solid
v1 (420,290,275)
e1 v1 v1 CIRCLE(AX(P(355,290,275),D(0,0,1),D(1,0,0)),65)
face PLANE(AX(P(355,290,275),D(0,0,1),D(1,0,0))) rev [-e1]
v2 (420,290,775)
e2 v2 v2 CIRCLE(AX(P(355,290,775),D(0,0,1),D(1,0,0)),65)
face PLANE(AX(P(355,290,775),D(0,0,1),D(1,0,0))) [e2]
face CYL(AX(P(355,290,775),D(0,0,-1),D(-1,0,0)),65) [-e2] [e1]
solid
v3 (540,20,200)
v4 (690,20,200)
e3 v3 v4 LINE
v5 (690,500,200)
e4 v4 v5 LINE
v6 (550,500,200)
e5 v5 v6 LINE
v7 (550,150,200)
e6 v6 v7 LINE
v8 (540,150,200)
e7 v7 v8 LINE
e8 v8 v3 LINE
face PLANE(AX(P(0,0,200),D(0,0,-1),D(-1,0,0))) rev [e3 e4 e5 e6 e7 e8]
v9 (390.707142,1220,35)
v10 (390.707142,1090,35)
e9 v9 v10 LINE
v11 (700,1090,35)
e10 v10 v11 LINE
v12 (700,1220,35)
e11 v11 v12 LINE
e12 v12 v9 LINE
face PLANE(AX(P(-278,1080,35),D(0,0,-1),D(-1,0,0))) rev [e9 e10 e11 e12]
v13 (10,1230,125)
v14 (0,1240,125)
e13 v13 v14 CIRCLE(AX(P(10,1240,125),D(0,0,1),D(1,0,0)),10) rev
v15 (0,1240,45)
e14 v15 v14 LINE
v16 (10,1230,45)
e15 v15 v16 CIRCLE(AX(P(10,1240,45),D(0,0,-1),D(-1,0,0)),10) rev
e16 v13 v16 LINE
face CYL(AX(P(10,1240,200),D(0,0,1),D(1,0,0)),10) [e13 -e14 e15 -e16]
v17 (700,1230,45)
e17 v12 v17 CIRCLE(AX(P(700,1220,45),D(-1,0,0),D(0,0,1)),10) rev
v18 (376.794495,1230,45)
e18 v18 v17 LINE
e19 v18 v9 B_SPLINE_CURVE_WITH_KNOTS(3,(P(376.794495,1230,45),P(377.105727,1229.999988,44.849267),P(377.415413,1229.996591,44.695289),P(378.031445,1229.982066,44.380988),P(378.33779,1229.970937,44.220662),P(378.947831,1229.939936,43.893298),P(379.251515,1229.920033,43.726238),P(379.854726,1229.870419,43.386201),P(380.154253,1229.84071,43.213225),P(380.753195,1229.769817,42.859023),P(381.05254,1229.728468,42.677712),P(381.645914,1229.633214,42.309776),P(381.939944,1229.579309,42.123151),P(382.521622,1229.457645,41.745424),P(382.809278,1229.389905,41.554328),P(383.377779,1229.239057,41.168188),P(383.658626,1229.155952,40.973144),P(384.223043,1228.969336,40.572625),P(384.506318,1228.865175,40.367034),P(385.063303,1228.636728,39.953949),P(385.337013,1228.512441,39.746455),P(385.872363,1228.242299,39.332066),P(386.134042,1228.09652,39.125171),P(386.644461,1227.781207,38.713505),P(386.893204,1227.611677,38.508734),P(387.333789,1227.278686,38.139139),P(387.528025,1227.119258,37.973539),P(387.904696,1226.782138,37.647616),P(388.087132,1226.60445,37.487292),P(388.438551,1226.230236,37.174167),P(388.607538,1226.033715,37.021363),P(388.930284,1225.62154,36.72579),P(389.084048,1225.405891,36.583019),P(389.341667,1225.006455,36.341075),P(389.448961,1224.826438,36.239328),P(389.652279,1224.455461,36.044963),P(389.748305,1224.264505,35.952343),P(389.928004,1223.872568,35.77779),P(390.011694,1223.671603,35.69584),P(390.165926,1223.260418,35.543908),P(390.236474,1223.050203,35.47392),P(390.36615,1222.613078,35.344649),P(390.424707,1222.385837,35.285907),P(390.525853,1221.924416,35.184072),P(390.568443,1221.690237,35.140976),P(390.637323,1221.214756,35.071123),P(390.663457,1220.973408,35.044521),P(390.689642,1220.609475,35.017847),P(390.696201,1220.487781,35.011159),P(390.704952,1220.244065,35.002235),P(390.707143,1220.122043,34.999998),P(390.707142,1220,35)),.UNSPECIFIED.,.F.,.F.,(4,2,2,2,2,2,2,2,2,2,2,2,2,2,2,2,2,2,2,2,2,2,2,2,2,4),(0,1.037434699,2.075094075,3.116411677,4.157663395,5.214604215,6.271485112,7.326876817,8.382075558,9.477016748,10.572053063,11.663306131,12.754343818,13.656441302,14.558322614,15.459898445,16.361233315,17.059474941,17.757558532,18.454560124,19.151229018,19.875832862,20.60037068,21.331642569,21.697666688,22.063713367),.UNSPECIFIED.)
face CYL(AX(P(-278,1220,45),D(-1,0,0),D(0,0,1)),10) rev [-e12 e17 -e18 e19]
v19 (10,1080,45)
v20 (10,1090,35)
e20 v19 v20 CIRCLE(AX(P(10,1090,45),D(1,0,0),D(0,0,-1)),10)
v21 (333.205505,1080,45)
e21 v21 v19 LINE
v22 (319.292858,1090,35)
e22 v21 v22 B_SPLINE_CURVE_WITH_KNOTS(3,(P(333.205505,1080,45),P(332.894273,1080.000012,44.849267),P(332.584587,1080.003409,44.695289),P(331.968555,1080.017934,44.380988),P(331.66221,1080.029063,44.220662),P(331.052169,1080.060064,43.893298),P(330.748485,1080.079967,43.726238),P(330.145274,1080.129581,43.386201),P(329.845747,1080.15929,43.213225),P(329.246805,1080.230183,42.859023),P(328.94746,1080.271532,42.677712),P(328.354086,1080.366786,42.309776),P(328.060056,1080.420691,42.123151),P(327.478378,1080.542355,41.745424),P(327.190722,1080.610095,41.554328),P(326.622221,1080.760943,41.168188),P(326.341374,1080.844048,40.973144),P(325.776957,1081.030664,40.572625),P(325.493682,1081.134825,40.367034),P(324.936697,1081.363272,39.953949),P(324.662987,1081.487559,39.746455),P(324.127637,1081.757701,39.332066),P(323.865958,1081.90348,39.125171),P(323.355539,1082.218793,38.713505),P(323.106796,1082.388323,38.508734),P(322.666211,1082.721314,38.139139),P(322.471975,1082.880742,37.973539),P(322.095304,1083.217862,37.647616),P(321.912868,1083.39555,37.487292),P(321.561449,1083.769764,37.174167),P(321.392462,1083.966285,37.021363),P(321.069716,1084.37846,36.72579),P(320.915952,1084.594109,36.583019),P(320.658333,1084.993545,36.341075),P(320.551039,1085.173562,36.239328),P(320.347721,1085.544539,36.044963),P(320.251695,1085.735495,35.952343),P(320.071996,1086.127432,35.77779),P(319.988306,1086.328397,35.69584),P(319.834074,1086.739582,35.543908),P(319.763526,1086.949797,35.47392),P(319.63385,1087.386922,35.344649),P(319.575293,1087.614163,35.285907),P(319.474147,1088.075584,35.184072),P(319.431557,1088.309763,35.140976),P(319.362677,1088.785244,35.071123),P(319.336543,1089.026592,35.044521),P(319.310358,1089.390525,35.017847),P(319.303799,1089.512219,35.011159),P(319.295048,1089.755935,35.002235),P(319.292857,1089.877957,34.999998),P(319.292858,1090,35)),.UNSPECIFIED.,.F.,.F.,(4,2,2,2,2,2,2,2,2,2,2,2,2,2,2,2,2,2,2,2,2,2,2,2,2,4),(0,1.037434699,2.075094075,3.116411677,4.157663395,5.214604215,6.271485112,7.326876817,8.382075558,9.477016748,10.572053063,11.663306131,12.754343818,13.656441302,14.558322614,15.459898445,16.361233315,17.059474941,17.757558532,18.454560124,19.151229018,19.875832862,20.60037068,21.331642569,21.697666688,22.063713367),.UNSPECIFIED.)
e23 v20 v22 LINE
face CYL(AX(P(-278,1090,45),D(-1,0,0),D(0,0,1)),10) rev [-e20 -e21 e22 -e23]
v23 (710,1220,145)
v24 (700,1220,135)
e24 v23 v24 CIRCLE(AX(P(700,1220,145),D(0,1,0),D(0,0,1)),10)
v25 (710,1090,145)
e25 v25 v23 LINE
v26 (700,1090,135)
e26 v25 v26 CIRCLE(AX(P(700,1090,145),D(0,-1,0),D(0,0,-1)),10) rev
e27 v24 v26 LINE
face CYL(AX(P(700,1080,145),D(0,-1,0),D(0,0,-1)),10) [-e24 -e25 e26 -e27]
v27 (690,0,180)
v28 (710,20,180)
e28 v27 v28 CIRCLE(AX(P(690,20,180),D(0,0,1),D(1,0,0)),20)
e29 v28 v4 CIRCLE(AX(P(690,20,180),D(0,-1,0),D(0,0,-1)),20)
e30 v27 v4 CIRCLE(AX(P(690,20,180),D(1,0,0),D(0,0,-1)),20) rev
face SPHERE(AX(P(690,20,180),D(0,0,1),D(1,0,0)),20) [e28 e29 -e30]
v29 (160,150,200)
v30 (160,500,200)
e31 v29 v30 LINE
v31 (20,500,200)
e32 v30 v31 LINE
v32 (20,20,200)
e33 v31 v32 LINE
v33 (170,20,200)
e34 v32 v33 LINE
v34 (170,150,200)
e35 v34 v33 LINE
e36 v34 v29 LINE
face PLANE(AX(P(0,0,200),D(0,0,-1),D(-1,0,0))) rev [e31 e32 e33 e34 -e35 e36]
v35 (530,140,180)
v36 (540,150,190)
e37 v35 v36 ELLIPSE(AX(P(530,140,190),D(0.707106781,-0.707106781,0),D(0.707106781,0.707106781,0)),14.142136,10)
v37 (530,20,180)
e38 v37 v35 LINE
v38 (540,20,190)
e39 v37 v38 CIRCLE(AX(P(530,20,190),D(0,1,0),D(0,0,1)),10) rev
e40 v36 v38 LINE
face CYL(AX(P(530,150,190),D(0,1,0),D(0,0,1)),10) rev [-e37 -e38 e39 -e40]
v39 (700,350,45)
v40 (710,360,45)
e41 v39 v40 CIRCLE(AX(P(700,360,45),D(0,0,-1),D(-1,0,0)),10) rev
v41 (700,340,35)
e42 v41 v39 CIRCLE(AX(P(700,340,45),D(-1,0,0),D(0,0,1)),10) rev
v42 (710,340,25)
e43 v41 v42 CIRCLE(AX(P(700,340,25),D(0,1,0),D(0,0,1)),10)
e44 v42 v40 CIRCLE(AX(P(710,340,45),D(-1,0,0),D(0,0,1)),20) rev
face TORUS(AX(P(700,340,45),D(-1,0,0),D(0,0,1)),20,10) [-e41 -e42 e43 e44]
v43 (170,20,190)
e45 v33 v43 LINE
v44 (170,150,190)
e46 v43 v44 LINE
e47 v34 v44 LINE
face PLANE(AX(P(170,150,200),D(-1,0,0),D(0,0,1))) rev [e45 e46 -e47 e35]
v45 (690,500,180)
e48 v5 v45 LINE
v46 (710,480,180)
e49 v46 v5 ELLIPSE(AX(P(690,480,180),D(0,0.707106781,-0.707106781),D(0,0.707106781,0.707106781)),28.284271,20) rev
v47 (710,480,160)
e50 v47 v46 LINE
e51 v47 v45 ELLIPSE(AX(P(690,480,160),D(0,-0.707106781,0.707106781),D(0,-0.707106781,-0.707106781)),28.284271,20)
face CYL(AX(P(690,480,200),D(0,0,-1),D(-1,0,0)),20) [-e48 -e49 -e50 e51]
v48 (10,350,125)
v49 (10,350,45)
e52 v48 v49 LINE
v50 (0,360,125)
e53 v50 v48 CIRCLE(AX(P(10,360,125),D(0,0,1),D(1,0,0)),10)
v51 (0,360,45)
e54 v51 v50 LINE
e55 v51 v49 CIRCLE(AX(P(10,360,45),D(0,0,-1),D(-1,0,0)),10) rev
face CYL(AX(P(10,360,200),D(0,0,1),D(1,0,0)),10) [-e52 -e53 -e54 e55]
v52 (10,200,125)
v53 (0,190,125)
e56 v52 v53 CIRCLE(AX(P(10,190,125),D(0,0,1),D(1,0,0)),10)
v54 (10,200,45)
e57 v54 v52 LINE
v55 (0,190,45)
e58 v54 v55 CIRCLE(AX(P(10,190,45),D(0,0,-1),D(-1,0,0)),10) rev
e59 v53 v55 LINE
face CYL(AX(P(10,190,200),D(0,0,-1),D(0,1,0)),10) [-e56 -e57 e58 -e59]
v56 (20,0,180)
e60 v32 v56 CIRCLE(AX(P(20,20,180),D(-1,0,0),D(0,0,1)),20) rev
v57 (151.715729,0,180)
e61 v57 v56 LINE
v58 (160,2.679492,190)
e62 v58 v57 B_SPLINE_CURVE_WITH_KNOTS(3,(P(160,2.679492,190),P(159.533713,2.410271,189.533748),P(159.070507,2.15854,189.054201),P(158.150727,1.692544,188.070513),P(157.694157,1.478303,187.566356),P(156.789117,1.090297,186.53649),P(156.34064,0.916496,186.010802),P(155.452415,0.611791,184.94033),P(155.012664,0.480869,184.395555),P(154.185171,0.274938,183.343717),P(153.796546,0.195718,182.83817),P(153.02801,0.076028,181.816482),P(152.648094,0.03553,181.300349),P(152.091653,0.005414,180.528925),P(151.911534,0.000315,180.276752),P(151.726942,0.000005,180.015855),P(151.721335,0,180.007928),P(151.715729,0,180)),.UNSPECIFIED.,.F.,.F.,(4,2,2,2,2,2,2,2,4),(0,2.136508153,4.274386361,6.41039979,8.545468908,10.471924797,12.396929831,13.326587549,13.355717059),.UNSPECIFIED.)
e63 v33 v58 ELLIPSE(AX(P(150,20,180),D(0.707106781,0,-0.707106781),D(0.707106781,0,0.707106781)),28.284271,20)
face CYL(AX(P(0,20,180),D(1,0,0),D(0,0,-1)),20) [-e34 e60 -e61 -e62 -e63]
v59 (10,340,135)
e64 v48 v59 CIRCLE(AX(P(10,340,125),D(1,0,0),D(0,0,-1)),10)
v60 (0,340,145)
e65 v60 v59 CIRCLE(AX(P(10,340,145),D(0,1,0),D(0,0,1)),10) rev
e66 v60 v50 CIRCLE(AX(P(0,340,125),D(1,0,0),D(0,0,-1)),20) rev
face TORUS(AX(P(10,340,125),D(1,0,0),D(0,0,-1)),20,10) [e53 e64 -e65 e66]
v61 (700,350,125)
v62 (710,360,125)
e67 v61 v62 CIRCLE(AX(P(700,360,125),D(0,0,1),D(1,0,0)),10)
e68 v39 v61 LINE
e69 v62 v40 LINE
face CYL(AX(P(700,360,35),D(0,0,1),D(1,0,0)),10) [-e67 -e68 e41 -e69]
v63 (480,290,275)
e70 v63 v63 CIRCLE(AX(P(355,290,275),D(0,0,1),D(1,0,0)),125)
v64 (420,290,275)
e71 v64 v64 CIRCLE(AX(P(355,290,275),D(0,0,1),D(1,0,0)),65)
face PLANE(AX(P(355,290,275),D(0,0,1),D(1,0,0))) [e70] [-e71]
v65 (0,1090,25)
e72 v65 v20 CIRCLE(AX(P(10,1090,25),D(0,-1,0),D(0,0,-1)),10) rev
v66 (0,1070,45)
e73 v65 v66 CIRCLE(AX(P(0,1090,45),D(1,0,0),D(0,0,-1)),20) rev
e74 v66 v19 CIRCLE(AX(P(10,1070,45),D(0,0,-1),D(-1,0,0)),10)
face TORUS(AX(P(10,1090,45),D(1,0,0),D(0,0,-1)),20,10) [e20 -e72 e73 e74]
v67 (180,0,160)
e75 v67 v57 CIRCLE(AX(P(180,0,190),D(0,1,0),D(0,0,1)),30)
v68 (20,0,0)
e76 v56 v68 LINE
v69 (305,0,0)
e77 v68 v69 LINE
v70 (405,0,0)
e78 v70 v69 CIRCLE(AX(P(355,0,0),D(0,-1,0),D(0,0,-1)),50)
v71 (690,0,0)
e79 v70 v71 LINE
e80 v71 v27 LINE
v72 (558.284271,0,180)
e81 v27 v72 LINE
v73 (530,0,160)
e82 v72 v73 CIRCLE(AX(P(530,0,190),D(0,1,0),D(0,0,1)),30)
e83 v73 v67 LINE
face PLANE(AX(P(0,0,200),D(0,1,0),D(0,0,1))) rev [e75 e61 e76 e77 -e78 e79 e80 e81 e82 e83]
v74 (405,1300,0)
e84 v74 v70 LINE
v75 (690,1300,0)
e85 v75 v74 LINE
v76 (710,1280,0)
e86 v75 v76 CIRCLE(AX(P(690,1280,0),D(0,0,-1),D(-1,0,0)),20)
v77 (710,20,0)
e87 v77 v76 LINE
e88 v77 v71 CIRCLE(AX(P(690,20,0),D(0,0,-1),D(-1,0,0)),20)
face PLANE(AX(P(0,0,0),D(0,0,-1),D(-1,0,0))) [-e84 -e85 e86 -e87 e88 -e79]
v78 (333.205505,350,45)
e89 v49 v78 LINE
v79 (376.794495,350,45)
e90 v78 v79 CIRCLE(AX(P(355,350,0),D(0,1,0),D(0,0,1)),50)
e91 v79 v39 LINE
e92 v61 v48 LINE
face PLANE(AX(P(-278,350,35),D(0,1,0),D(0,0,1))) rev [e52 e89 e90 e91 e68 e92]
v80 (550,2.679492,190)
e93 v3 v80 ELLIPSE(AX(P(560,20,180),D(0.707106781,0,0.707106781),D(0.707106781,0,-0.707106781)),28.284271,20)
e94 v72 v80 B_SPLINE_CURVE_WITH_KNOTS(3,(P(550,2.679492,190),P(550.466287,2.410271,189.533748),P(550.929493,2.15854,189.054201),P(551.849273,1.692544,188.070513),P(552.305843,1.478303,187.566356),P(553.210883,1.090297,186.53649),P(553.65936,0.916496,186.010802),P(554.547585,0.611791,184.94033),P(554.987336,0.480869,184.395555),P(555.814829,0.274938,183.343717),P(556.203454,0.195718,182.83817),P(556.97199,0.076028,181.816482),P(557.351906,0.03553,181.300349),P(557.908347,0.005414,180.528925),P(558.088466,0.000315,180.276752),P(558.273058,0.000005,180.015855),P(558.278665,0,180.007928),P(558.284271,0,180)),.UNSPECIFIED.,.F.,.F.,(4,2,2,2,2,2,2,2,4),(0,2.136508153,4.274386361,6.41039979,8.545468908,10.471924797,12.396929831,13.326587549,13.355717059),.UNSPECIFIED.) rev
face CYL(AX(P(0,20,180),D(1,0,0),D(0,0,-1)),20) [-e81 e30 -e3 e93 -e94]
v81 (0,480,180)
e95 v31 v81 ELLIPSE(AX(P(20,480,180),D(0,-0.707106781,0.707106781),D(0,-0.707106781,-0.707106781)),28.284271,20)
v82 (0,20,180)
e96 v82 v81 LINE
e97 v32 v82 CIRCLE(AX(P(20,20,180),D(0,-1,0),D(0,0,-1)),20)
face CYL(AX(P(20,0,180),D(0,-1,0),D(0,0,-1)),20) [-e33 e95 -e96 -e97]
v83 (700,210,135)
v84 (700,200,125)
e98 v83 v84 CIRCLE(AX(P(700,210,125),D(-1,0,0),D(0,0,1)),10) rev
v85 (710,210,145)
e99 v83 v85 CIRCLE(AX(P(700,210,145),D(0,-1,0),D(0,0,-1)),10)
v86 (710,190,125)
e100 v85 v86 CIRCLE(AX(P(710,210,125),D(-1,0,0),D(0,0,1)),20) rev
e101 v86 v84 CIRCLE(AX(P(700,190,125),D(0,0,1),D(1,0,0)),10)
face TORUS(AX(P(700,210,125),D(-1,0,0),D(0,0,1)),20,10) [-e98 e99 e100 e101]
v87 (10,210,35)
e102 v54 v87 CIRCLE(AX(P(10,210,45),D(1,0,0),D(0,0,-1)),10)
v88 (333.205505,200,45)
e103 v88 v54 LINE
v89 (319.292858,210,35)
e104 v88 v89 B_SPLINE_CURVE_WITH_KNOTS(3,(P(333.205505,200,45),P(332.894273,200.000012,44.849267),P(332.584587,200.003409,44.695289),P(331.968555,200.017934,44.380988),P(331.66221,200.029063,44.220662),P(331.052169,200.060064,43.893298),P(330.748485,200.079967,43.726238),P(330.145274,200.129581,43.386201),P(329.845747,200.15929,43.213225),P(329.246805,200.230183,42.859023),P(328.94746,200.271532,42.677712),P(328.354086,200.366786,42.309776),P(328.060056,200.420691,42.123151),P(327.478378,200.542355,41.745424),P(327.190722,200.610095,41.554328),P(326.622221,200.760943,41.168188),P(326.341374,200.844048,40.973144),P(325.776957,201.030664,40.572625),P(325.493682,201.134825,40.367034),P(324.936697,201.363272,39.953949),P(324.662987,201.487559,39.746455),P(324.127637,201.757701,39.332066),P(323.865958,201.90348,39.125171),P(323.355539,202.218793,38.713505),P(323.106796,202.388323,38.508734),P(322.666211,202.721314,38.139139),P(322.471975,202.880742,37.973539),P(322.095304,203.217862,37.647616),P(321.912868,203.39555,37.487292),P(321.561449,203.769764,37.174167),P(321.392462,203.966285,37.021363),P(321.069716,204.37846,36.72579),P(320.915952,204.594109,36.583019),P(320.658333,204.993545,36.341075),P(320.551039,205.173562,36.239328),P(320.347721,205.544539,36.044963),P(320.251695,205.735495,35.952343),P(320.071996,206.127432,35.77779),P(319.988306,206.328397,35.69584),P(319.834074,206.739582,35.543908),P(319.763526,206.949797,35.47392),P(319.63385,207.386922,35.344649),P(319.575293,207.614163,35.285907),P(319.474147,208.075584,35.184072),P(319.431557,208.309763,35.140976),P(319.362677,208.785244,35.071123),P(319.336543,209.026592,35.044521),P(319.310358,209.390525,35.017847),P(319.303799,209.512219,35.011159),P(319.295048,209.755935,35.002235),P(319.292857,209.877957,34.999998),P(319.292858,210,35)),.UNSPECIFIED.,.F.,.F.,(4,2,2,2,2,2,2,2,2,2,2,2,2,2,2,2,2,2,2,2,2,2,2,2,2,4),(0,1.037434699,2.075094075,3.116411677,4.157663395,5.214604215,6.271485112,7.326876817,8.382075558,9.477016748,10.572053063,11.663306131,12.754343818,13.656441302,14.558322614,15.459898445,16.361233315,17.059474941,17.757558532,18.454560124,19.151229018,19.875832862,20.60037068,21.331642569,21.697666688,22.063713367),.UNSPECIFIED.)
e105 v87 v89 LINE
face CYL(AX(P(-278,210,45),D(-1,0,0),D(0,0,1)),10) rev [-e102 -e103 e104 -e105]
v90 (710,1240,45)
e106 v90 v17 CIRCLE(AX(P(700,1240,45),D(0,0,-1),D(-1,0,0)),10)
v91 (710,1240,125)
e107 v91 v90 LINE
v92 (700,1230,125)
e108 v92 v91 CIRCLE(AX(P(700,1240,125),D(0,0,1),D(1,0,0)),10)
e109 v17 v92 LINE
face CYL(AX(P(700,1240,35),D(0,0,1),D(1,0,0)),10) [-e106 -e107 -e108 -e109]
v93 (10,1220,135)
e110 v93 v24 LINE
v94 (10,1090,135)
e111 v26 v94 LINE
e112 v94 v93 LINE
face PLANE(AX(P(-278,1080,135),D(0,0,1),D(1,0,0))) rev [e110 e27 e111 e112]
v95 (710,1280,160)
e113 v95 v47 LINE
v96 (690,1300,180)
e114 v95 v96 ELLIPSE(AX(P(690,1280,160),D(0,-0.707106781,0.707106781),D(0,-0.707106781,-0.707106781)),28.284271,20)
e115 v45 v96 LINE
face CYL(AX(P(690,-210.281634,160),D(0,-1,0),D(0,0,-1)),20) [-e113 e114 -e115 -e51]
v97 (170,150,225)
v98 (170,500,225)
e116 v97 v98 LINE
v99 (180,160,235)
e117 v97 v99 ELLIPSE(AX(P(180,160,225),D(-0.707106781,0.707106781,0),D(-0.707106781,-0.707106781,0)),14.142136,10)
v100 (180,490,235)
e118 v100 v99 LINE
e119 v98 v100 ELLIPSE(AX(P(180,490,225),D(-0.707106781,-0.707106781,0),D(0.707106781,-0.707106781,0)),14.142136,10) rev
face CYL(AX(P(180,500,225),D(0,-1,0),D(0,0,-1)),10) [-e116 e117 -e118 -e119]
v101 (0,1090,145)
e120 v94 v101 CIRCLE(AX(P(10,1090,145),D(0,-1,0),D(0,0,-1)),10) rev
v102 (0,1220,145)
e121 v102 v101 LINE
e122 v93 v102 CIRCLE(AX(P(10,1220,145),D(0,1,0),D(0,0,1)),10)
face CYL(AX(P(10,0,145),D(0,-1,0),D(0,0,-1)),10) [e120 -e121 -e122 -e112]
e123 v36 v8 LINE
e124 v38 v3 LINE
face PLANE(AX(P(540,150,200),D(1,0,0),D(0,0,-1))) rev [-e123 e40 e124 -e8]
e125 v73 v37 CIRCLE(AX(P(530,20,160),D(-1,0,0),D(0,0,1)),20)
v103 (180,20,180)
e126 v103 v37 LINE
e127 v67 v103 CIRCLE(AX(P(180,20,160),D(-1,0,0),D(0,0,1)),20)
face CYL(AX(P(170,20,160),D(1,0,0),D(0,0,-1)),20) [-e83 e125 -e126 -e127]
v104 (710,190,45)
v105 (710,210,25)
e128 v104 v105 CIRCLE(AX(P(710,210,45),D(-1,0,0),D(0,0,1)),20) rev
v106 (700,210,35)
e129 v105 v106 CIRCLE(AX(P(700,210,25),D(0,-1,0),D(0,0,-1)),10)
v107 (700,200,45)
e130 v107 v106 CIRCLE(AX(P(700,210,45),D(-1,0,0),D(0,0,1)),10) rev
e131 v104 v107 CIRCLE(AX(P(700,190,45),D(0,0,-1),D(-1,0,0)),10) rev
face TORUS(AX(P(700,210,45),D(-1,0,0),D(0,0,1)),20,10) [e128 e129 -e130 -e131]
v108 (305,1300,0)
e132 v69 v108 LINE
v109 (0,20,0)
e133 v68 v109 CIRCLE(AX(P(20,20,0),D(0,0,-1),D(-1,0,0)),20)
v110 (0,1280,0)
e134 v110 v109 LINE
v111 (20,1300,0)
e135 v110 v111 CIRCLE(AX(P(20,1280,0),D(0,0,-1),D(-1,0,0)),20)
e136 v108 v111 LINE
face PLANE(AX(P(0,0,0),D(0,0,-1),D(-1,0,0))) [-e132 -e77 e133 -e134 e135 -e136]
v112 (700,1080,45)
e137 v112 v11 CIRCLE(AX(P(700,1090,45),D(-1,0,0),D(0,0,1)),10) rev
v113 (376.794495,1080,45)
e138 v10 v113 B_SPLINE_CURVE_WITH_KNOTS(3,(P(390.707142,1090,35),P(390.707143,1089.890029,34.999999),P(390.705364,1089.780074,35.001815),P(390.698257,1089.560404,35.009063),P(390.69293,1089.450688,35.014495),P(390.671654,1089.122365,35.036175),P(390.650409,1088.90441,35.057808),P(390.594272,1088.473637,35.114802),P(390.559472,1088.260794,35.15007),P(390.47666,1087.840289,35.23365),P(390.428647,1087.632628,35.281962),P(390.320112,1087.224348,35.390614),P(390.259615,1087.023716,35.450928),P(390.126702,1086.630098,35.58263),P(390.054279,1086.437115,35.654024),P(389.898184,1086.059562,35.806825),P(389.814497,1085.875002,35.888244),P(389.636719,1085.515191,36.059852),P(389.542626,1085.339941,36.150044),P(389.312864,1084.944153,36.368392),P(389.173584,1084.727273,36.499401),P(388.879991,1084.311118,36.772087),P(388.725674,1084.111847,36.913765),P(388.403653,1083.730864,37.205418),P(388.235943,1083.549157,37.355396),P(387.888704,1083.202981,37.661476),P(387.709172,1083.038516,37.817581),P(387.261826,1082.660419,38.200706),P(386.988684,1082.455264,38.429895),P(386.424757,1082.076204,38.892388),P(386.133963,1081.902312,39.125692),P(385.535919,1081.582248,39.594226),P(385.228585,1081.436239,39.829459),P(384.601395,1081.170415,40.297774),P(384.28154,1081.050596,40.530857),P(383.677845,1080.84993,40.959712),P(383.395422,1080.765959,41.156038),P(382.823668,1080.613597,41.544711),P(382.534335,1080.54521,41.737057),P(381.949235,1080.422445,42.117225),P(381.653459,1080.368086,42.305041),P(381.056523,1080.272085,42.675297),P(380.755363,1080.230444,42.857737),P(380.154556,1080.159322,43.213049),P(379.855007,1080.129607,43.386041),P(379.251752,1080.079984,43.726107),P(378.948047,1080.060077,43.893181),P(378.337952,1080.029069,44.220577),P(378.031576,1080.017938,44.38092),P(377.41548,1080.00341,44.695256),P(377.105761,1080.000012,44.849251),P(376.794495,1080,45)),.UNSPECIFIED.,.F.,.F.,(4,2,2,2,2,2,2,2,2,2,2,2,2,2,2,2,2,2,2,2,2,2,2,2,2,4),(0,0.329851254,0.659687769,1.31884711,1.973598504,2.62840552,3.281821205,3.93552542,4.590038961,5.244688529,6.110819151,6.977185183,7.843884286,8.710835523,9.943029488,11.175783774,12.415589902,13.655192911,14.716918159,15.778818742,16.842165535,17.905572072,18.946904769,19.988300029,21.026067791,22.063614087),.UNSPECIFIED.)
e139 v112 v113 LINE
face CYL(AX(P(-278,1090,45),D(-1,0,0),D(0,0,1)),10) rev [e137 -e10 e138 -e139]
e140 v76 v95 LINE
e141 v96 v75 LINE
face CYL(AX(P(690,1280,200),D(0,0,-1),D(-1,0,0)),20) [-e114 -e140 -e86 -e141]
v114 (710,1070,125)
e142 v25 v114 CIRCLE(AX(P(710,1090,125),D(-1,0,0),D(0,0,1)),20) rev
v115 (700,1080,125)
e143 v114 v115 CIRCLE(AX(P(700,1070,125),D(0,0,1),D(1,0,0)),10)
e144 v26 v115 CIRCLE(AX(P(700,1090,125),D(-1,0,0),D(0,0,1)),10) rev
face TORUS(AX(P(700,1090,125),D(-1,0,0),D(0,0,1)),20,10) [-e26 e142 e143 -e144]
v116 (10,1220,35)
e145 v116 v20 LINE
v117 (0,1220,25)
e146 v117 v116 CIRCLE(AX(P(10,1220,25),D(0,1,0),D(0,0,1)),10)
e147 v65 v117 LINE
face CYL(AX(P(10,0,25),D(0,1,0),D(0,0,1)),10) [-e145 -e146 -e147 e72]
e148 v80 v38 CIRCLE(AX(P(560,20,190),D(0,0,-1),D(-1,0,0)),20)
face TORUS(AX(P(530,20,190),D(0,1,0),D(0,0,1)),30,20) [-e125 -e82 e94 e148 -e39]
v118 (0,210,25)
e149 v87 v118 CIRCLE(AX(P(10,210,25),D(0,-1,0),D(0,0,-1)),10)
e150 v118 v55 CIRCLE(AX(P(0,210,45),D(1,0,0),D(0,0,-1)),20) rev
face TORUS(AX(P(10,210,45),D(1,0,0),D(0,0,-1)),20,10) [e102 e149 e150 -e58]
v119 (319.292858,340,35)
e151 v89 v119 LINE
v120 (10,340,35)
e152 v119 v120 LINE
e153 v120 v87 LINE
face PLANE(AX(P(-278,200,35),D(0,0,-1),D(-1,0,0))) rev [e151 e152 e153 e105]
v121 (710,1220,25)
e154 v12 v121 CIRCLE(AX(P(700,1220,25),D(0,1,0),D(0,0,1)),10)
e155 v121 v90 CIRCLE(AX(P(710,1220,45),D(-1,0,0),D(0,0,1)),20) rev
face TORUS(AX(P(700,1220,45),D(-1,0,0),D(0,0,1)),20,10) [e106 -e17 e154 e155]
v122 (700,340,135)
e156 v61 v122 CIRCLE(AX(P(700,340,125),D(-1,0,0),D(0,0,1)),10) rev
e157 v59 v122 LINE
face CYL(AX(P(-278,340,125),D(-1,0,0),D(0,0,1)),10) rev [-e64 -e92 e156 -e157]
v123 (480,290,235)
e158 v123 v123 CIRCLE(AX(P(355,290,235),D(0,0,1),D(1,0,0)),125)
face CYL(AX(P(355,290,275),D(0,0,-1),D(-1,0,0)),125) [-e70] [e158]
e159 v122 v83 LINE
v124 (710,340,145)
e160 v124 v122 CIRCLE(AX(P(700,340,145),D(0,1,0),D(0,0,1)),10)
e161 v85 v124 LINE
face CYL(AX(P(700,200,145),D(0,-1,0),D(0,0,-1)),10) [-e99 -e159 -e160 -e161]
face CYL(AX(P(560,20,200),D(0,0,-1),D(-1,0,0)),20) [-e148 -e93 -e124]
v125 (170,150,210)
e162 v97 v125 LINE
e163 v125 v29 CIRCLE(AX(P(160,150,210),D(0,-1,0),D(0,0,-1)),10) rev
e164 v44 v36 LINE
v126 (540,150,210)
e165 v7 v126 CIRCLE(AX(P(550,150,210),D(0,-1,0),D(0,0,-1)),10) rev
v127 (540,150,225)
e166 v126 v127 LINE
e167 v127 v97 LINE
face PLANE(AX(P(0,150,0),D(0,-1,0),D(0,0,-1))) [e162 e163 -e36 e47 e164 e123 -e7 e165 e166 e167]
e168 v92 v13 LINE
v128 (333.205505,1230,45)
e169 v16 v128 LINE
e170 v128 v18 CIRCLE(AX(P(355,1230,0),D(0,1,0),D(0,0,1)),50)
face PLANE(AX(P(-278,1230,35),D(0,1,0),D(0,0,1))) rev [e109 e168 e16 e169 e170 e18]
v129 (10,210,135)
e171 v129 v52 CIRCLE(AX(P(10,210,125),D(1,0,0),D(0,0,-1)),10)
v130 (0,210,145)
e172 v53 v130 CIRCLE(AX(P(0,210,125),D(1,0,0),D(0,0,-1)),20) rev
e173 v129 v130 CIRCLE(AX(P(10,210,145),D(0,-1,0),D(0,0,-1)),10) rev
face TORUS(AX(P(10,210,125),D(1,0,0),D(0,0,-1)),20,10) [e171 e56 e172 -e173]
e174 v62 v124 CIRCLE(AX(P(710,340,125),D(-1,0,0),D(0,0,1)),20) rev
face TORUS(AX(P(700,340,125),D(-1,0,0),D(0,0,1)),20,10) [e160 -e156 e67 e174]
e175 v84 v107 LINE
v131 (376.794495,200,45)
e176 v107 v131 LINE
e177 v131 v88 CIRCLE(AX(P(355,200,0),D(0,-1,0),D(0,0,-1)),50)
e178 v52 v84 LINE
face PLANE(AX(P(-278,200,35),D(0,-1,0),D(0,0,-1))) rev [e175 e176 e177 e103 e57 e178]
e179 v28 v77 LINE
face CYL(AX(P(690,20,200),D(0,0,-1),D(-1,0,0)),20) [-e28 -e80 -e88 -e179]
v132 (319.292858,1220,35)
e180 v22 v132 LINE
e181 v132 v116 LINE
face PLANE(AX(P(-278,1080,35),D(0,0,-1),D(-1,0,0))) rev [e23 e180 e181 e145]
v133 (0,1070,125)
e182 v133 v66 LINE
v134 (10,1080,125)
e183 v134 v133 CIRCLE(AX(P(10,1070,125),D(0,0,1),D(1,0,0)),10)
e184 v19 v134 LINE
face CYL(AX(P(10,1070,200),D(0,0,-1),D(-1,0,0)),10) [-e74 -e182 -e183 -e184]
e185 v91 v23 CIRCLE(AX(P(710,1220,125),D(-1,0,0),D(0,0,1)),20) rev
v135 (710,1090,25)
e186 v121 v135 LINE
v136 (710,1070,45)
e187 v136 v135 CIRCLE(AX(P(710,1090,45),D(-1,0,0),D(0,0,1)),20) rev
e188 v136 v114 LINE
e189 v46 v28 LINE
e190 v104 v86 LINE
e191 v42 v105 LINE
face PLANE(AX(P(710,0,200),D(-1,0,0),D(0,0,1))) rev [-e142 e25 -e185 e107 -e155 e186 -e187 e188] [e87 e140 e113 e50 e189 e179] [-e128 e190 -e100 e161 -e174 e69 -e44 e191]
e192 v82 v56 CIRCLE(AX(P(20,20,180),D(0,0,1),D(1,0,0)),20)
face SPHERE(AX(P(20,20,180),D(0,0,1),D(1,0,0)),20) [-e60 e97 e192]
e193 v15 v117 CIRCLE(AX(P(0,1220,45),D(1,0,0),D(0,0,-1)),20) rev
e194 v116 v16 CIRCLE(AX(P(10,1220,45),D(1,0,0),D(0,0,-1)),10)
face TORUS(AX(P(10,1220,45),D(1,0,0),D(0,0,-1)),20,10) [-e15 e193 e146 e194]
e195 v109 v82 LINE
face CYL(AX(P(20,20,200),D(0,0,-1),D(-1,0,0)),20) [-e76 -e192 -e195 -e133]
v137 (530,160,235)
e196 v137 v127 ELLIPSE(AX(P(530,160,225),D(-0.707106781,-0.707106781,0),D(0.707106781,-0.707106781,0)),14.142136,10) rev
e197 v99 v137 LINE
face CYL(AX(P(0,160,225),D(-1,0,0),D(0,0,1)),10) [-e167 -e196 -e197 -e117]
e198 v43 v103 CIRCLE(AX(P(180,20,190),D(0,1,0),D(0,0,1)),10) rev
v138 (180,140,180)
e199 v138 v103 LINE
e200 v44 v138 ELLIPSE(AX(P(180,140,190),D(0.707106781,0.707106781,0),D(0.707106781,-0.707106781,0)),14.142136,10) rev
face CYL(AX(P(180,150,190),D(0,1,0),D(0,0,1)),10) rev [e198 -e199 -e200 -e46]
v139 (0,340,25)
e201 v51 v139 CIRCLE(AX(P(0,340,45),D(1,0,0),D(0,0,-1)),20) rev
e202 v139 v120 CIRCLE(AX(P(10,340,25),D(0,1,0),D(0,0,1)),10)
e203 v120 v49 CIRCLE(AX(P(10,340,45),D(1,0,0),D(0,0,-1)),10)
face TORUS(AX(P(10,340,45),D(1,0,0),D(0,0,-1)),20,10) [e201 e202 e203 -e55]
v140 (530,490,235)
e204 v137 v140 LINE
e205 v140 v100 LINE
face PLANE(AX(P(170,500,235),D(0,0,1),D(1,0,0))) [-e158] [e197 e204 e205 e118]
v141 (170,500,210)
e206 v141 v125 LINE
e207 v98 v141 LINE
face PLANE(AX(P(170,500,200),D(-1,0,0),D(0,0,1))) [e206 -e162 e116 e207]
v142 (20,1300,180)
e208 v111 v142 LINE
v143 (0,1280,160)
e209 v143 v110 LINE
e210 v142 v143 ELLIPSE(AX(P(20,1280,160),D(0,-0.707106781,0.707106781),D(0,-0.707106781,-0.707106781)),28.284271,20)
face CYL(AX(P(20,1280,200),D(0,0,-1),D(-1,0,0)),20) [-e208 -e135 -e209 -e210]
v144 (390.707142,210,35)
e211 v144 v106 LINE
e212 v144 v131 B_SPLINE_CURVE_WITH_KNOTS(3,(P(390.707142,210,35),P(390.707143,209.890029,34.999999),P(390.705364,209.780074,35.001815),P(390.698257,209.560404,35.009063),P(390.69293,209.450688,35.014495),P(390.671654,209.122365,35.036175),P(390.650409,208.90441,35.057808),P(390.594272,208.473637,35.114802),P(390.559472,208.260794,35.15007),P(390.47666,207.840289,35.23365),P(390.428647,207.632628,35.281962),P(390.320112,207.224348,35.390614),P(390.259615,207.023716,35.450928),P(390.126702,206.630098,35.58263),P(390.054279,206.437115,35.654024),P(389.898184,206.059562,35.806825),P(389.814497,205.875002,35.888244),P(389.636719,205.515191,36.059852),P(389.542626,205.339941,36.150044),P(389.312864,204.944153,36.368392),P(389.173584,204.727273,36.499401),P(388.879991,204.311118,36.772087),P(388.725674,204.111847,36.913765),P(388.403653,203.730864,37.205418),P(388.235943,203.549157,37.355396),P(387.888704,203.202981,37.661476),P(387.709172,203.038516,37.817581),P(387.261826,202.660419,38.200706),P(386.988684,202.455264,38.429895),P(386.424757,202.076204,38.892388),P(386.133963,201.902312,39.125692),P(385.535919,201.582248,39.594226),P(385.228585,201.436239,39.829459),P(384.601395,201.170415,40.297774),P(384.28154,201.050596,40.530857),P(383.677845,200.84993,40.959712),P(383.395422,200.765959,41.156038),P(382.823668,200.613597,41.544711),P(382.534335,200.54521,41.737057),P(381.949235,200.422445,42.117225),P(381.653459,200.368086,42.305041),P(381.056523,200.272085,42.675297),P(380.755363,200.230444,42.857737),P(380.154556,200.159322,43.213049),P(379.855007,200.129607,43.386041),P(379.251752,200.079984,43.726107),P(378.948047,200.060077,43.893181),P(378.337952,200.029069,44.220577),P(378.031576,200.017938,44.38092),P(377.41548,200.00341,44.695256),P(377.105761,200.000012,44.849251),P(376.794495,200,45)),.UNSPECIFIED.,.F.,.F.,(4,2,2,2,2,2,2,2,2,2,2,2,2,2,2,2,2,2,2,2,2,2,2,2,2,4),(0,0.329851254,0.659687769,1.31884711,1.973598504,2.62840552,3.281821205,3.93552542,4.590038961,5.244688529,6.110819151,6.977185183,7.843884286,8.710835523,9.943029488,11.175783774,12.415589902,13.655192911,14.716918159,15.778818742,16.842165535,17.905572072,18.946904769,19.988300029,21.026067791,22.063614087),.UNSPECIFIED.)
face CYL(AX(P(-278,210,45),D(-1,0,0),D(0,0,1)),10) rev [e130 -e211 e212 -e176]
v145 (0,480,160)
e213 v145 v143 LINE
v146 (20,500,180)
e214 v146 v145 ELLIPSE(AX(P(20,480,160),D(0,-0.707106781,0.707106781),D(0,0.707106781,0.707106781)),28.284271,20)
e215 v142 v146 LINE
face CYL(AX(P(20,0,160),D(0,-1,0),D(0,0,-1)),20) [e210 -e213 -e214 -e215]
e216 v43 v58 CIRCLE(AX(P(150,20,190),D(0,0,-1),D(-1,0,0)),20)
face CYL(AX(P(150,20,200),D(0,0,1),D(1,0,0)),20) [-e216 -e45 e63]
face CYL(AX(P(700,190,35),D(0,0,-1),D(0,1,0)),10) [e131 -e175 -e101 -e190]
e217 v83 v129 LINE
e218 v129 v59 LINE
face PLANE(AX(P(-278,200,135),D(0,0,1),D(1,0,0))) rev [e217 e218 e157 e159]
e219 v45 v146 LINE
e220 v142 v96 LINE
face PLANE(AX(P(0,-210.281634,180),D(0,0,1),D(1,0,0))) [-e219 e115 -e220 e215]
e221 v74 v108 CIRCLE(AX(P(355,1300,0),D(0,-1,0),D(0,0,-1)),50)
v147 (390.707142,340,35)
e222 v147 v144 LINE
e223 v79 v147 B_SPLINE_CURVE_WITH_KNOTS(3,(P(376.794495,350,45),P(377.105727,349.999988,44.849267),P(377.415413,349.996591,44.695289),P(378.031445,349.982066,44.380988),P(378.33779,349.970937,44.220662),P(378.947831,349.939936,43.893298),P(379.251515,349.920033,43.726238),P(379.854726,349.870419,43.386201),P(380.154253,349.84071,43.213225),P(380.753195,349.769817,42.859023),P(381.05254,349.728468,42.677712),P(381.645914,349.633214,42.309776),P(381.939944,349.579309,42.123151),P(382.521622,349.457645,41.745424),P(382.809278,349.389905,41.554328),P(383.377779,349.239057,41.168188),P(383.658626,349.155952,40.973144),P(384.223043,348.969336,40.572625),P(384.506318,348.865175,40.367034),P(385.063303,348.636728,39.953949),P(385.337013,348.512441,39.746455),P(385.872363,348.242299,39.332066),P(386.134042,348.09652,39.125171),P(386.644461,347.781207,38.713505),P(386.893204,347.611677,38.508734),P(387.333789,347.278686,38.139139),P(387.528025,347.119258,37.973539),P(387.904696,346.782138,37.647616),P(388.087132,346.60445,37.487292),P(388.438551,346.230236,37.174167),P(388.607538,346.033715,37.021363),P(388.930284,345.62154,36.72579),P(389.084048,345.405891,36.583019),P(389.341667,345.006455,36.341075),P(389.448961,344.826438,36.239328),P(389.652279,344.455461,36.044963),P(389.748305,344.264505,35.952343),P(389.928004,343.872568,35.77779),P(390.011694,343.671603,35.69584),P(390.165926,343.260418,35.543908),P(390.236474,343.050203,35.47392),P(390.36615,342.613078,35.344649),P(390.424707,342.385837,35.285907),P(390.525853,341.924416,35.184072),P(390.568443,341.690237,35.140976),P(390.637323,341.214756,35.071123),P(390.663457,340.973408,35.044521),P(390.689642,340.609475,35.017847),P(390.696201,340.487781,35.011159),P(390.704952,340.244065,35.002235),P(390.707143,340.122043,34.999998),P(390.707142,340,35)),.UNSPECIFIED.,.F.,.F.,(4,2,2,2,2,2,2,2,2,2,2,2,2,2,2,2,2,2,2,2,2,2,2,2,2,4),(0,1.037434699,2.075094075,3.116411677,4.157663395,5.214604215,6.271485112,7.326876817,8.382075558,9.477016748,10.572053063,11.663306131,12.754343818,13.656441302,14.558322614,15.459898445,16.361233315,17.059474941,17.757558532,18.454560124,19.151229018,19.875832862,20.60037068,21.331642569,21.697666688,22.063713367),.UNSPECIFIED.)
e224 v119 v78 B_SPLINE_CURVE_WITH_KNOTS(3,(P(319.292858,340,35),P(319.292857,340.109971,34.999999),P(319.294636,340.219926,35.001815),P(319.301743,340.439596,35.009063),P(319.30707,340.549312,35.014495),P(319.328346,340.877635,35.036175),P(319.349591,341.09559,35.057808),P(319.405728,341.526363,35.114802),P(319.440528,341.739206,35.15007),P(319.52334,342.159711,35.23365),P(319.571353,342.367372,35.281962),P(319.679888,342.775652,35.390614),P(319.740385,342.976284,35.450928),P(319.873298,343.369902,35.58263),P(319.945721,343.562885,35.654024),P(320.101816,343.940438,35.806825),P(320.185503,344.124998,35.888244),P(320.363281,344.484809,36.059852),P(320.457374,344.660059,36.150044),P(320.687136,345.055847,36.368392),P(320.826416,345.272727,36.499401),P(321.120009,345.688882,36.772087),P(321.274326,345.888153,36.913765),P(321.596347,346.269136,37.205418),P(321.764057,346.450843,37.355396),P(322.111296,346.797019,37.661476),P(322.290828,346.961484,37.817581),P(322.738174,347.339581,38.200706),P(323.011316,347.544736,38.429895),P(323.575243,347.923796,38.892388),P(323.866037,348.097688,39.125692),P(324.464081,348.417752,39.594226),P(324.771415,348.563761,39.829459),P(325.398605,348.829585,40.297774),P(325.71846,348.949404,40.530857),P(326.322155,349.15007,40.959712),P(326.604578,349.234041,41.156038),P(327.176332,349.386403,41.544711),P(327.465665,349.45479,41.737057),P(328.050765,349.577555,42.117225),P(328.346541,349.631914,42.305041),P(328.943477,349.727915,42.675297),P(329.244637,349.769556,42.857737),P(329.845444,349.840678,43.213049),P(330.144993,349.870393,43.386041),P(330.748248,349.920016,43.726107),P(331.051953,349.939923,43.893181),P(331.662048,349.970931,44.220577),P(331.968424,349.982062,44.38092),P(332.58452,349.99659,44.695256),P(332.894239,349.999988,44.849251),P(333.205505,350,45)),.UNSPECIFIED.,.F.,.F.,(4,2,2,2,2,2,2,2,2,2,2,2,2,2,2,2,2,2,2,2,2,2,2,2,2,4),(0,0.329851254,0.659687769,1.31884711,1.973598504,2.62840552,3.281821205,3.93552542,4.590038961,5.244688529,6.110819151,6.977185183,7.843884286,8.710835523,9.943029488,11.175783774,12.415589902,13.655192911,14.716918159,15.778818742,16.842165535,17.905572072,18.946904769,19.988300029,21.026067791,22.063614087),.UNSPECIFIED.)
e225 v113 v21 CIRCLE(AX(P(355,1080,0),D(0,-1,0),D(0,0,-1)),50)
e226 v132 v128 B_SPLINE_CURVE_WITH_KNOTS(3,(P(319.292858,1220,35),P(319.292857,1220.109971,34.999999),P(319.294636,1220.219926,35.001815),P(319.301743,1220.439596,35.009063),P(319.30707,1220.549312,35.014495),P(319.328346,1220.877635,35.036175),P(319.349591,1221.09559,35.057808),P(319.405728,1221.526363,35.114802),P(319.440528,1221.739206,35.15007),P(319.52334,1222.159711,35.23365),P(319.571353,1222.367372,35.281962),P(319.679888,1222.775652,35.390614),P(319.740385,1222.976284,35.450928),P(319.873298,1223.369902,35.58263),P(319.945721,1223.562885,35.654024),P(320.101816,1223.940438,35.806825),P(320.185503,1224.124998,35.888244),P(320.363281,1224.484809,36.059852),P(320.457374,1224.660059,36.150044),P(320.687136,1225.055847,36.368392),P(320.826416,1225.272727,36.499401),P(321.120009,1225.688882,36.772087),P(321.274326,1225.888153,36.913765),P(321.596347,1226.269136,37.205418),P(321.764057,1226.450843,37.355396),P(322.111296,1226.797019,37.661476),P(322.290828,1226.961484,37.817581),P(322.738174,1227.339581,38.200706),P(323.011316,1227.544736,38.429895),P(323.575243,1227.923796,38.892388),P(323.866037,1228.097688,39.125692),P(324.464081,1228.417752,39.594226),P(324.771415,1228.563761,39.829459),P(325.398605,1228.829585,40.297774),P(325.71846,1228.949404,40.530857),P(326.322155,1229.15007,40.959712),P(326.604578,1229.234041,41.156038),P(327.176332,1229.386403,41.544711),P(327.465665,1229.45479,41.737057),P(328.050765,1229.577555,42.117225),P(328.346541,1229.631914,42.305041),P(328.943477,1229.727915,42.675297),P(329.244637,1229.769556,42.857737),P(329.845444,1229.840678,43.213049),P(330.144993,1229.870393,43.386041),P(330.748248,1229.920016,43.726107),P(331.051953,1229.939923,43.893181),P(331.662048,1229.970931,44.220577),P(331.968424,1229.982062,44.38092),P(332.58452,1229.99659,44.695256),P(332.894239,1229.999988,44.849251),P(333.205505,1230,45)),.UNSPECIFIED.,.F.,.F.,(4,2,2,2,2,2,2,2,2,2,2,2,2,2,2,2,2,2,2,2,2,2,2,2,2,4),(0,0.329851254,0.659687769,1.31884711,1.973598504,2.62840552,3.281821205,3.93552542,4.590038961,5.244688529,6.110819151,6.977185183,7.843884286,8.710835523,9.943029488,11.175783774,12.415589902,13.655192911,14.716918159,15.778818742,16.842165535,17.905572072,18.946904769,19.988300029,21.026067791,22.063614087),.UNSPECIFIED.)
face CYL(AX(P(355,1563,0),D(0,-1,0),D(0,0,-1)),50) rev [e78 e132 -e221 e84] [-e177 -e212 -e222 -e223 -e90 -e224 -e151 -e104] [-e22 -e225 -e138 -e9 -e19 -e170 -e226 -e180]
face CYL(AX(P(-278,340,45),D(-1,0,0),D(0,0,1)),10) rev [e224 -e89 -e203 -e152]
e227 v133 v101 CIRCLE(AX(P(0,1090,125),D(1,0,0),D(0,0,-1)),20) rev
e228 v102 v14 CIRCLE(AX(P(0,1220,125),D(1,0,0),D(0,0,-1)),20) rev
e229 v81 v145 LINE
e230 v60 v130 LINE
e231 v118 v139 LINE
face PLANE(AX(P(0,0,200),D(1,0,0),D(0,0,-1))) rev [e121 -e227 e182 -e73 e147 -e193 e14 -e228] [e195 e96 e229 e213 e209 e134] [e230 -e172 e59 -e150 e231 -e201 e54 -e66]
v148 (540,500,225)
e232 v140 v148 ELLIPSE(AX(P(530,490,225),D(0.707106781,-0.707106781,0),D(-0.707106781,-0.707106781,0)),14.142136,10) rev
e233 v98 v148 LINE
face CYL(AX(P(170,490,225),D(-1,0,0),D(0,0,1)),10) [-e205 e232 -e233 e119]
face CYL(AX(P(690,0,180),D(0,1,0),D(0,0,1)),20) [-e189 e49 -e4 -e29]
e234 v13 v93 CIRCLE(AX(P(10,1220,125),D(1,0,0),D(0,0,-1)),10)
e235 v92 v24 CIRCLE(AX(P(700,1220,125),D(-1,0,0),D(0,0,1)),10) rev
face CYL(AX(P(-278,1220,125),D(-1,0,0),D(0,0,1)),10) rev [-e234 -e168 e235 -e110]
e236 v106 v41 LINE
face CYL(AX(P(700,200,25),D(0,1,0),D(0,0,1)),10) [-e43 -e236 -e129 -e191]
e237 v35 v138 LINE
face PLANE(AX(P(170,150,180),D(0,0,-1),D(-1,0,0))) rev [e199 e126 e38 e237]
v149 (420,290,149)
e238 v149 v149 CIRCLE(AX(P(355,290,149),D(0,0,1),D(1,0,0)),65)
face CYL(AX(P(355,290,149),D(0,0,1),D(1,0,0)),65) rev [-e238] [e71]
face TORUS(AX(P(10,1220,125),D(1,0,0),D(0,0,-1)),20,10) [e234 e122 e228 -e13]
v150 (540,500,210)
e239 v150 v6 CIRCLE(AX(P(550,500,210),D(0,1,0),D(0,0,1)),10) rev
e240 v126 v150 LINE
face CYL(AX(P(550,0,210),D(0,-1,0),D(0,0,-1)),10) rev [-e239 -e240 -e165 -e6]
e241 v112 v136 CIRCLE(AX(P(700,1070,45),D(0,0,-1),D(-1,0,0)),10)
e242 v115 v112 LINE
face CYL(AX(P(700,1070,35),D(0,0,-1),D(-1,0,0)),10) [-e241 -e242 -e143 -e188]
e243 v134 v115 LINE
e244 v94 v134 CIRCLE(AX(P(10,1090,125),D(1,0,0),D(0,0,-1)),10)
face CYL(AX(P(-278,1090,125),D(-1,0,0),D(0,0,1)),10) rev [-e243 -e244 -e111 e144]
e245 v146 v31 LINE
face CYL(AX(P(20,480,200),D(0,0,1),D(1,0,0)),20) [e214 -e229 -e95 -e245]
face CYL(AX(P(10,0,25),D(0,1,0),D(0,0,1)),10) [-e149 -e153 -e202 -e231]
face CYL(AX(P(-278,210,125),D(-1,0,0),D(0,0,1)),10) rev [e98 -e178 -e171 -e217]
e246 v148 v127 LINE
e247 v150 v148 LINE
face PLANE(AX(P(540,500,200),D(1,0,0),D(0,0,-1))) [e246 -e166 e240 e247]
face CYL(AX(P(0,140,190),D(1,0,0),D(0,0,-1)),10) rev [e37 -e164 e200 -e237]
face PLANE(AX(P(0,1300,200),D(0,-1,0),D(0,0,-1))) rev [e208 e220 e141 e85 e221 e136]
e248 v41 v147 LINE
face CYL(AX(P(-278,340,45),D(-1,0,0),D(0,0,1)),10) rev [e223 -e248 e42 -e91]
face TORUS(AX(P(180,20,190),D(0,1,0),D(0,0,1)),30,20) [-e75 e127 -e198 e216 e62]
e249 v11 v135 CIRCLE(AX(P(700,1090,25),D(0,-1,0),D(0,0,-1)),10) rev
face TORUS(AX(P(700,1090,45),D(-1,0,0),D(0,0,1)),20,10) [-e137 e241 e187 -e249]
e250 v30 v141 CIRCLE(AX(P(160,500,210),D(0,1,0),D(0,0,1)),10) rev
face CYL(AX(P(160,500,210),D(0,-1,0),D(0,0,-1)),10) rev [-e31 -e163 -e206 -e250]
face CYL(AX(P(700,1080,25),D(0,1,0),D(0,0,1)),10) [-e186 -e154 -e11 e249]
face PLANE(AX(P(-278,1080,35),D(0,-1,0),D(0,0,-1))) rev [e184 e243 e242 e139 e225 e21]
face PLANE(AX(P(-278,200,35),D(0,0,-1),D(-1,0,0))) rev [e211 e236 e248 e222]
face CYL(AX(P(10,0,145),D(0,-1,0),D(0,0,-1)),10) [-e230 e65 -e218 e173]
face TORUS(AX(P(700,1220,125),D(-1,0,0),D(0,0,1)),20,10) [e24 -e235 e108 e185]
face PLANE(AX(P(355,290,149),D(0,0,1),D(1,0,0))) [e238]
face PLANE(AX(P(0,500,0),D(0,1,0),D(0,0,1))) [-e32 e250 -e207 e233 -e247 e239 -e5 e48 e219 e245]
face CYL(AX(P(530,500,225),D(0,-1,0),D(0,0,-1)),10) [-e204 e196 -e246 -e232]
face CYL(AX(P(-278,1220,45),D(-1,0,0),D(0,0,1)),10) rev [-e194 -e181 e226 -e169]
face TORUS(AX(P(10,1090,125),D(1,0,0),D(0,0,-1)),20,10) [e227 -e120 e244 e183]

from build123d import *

# Parameters (mm, degrees)
SKETCH1_W           = 710
SKETCH1_H           = 1300
BOSS_EXTRUDE1_DEPTH = 200
SKETCH2_W           = 100
SKETCH2_H           = 150
CUT_EXTRUDE1_DEPTH  = 988
SKETCH4_W           = 370
SKETCH4_H           = 20
CUT_EXTRUDE2_DEPTH  = 150
SKETCH5_W           = 370
SKETCH5_H           = 35
BOSS_EXTRUDE2_DEPTH = 350
SKETCH6_R           = 125
BOSS_EXTRUDE3_DEPTH = 40
SKETCH7_R           = 65
CUT_EXTRUDE3_DEPTH  = 126
FILLET4_R           = 10
FILLET5_R           = 10
SKETCH8_W           = 710
SKETCH8_H           = 20
CUT_EXTRUDE6_DEPTH  = 800
SKETCH9_R           = 50
CUT_EXTRUDE7_DEPTH  = 1563
FILLET6_R           = 20
FILLET7_R           = 10
FILLET8_R           = 10
SKETCH10_R          = 65
BOSS_EXTRUDE4_DEPTH = 500


with BuildPart() as part:
    # Sketch1 → Boss-Extrude1 (new body)
    with BuildSketch(Plane.XY):
        with Locations((355, 650)):
            Rectangle(SKETCH1_W, SKETCH1_H)
    extrude(amount=BOSS_EXTRUDE1_DEPTH)

    # Sketch2 → Cut-Extrude1 (cut)
    with BuildSketch(Plane(origin=(710, 0, 0), x_dir=(0, 0, -1), z_dir=(1, 0, 0))):
        with Locations((-85, 275)):
            Rectangle(SKETCH2_W, SKETCH2_H)
        with Locations((-85, 1155)):
            Rectangle(SKETCH2_W, SKETCH2_H)
    extrude(amount=-CUT_EXTRUDE1_DEPTH, mode=Mode.SUBTRACT)

    # Sketch4 → Cut-Extrude2 (cut)
    with BuildSketch(Plane.XZ):
        with Locations((355, 190)):
            Rectangle(SKETCH4_W, SKETCH4_H)
    extrude(amount=-CUT_EXTRUDE2_DEPTH, mode=Mode.SUBTRACT)

    # Sketch5 → Boss-Extrude2 (add)
    with BuildSketch(Plane.XZ.offset(-150)):
        with Locations((355, 217.5)):
            Rectangle(SKETCH5_W, SKETCH5_H)
    extrude(amount=-BOSS_EXTRUDE2_DEPTH)

    # Sketch6 → Boss-Extrude3 (add)
    with BuildSketch(Plane.XY.offset(235)):
        with Locations((355, 290)):
            Circle(SKETCH6_R)
    extrude(amount=BOSS_EXTRUDE3_DEPTH)

    # Sketch7 → Cut-Extrude3 (cut)
    with BuildSketch(Plane.XY.offset(275)):
        with Locations((355, 290)):
            Circle(SKETCH7_R)
    extrude(amount=-CUT_EXTRUDE3_DEPTH, mode=Mode.SUBTRACT)

    # Fillet4
    fillet4_edges = [part.edges().sort_by_distance(p)[0] for p in [
        (170, 75, 180),
        (355, 150, 180),
        (540, 75, 180),
    ]]
    fillet(fillet4_edges, radius=FILLET4_R)

    # Fillet5
    fillet5_edges = [part.edges().sort_by_distance(p)[0] for p in [
        (0, 275, 35),
        (355, 350, 35),
        (0, 200, 85),
        (355, 200, 35),
        (0, 275, 135),
        (355, 200, 135),
        (0, 350, 85),
        (355, 350, 135),
        (710, 275, 35),
        (710, 350, 85),
        (710, 275, 135),
        (710, 200, 85),
        (0, 1155, 35),
        (355, 1230, 35),
        (0, 1080, 85),
        (355, 1080, 35),
        (0, 1155, 135),
        (355, 1080, 135),
        (0, 1230, 85),
        (355, 1230, 135),
        (710, 1155, 35),
        (710, 1230, 85),
        (710, 1155, 135),
        (710, 1080, 85),
    ]]
    fillet(fillet5_edges, radius=FILLET5_R)

    # Sketch8 → Cut-Extrude6 (cut)
    with BuildSketch(Plane(origin=(0, 1300, 0), x_dir=(1, 0, 0), z_dir=(0, 1, 0))):
        with Locations((355, -190)):
            Rectangle(SKETCH8_W, SKETCH8_H)
    extrude(amount=-CUT_EXTRUDE6_DEPTH, mode=Mode.SUBTRACT)

    # Sketch9 → Cut-Extrude7 (cut)
    with BuildSketch(Plane.XZ):
        with Locations((355, 0)):
            Circle(SKETCH9_R)
    extrude(amount=-CUT_EXTRUDE7_DEPTH, mode=Mode.SUBTRACT)

    # Fillet6
    # the kernel refuses this fillet: 20 mm, written as the material it takes off along each edge
    with BuildSketch(Plane(origin=(690, 20, 180), x_dir=(0, 0, 1), z_dir=(1, 0, 0))) as fillet6_piece_1_section:
        Polygon((0, 0), (FILLET6_R, 0), (FILLET6_R, FILLET6_R), (0, FILLET6_R), align=None)
    fillet6_piece_1 = extrude(amount=FILLET6_R, mode=Mode.PRIVATE)
    fillet6_piece_1 = fillet6_piece_1 - Plane(origin=(690, 20, 180), x_dir=(0, 0.7071067811865475, -0.7071067811865475), z_dir=(1, 0, 0)) * Sphere(FILLET6_R, mode=Mode.PRIVATE)
    add(fillet6_piece_1, mode=Mode.SUBTRACT)
    with BuildSketch(Plane(origin=(20, 20, 180), x_dir=(0, 0, 1), z_dir=(-1, 0, 0))) as fillet6_piece_2_section:
        Polygon((0, 0), (FILLET6_R, 0), (FILLET6_R, -FILLET6_R), (0, -FILLET6_R), align=None)
    fillet6_piece_2 = extrude(amount=FILLET6_R, mode=Mode.PRIVATE)
    fillet6_piece_2 = fillet6_piece_2 - Plane(origin=(20, 20, 180), x_dir=(0, 0.7071067811865475, -0.7071067811865475), z_dir=(-1, 0, 0)) * Sphere(FILLET6_R, mode=Mode.PRIVATE)
    add(fillet6_piece_2, mode=Mode.SUBTRACT)
    with BuildSketch(Plane(origin=(180, 0, 190), x_dir=(0, 0, -1), z_dir=(1, 0, 0))) as fillet6_piece_3:
        with BuildLine():
            CenterArc((10 + FILLET6_R, FILLET6_R), FILLET6_R, 180, 90)
            Line((10, FILLET6_R), (10, 0))
            Line((10, 0), (10 + FILLET6_R, 0))
        make_face()
    revolve(axis=Axis((180, 0, 190), (0, 1, 0)), revolution_arc=90, mode=Mode.SUBTRACT)
    with BuildSketch(Plane(origin=(530, 0, 190), x_dir=(1, 0, 0), z_dir=(0, 0, 1))) as fillet6_piece_4:
        with BuildLine():
            CenterArc((10 + FILLET6_R, FILLET6_R), FILLET6_R, 180, 90)
            Line((10, FILLET6_R), (10, 0))
            Line((10, 0), (10 + FILLET6_R, 0))
        make_face()
    revolve(axis=Axis((530, 0, 190), (0, 1, 0)), revolution_arc=90, mode=Mode.SUBTRACT)
    with BuildSketch(Plane(origin=(710, 1350, 180), x_dir=(0, 0, -1), z_dir=(0, -1, 0)), Plane(origin=(0, 1350, 180), x_dir=(1, 0, 0), z_dir=(0, -1, 0))) as fillet6_piece_5:
        with BuildLine():
            CenterArc((FILLET6_R, -FILLET6_R), FILLET6_R, 90, 90)
            Line((0, -FILLET6_R), (0, 0))
            Line((0, 0), (FILLET6_R, 0))
        make_face()
    extrude(amount=850, mode=Mode.SUBTRACT)
    with BuildSketch(Plane(origin=(710, 500, 250), x_dir=(0, -1, 0), z_dir=(0, 0, -1))) as fillet6_piece_6:
        with BuildLine():
            CenterArc((FILLET6_R, FILLET6_R), FILLET6_R, 180, 90)
            Line((0, FILLET6_R), (0, 0))
            Line((0, 0), (FILLET6_R, 0))
        make_face()
    extrude(amount=70, mode=Mode.SUBTRACT)
    with BuildSketch(Plane(origin=(0, 500, 180), x_dir=(1, 0, 0), z_dir=(0, 0, 1))) as fillet6_piece_7:
        with BuildLine():
            CenterArc((FILLET6_R, -FILLET6_R), FILLET6_R, 90, 90)
            Line((0, -FILLET6_R), (0, 0))
            Line((0, 0), (FILLET6_R, 0))
        make_face()
    extrude(amount=70, mode=Mode.SUBTRACT)
    with BuildSketch(Plane(origin=(710, 20, 200), x_dir=(0, 0, -1), z_dir=(0, 1, 0)), Plane(origin=(0, 550, 200), x_dir=(0, 0, -1), z_dir=(0, -1, 0))) as fillet6_piece_8:
        with BuildLine():
            CenterArc((FILLET6_R, FILLET6_R), FILLET6_R, 180, 90)
            Line((0, FILLET6_R), (0, 0))
            Line((0, 0), (FILLET6_R, 0))
        make_face()
    extrude(amount=530, mode=Mode.SUBTRACT)
    with BuildSketch(Plane(origin=(490, 0, 200), x_dir=(0, 1, 0), z_dir=(1, 0, 0))) as fillet6_piece_9:
        with BuildLine():
            CenterArc((FILLET6_R, -FILLET6_R), FILLET6_R, 90, 90)
            Line((0, -FILLET6_R), (0, 0))
            Line((0, 0), (FILLET6_R, 0))
        make_face()
    extrude(amount=200, mode=Mode.SUBTRACT)
    with BuildSketch(Plane(origin=(20, 0, 200), x_dir=(0, 0, -1), z_dir=(1, 0, 0))) as fillet6_piece_10:
        with BuildLine():
            CenterArc((FILLET6_R, FILLET6_R), FILLET6_R, 180, 90)
            Line((0, FILLET6_R), (0, 0))
            Line((0, 0), (FILLET6_R, 0))
        make_face()
    extrude(amount=200, mode=Mode.SUBTRACT)
    with BuildSketch(Plane(origin=(530, 0, 180), x_dir=(0, 0, -1), z_dir=(-1, 0, 0))) as fillet6_piece_11:
        with BuildLine():
            CenterArc((FILLET6_R, -FILLET6_R), FILLET6_R, 90, 90)
            Line((0, -FILLET6_R), (0, 0))
            Line((0, 0), (FILLET6_R, 0))
        make_face()
    extrude(amount=350, mode=Mode.SUBTRACT)
    with BuildSketch(Plane(origin=(710, 1300, -50), x_dir=(0, -1, 0), z_dir=(0, 0, 1)), Plane(origin=(0, 1300, -50), x_dir=(1, 0, 0), z_dir=(0, 0, 1))) as fillet6_piece_12:
        with BuildLine():
            CenterArc((FILLET6_R, -FILLET6_R), FILLET6_R, 90, 90)
            Line((0, -FILLET6_R), (0, 0))
            Line((0, 0), (FILLET6_R, 0))
        make_face()
    extrude(amount=280, mode=Mode.SUBTRACT)
    with BuildSketch(Plane(origin=(0, 0, -50), x_dir=(1, 0, 0), z_dir=(0, 0, 1)), Plane(origin=(710, 0, -50), x_dir=(0, 1, 0), z_dir=(0, 0, 1))) as fillet6_piece_13:
        with BuildLine():
            CenterArc((FILLET6_R, FILLET6_R), FILLET6_R, 180, 90)
            Line((0, FILLET6_R), (0, 0))
            Line((0, 0), (FILLET6_R, 0))
        make_face()
    extrude(amount=230, mode=Mode.SUBTRACT)
    with BuildSketch(Plane(origin=(540, 0, 250), x_dir=(1, 0, 0), z_dir=(0, 0, -1)), Plane(origin=(170, 0, 190), x_dir=(-1, 0, 0), z_dir=(0, 0, 1))) as fillet6_piece_14:
        with BuildLine():
            CenterArc((FILLET6_R, -FILLET6_R), FILLET6_R, 90, 90)
            Line((0, -FILLET6_R), (0, 0))
            Line((0, 0), (FILLET6_R, 0))
        make_face()
    extrude(amount=60, mode=Mode.SUBTRACT)
    with BuildSketch(Plane(origin=(710, 1350, 180), x_dir=(0, 0, -1), z_dir=(0, -1, 0))) as fillet6_piece_15a_section:
        with BuildLine():
            CenterArc((FILLET6_R, -FILLET6_R), FILLET6_R, 90, 90)
            Line((0, -FILLET6_R), (0, 0))
            Line((0, 0), (FILLET6_R, 0))
        make_face()
    fillet6_piece_15a = extrude(amount=900, mode=Mode.PRIVATE)
    fillet6_piece_15a = split(fillet6_piece_15a, bisect_by=Plane(origin=(705.472097715, 500, 175.472097715), z_dir=(0, -1, 0)), keep=Keep.TOP, mode=Mode.PRIVATE)
    with BuildSketch(Plane(origin=(710, 500, 250), x_dir=(0, -1, 0), z_dir=(0, 0, -1))) as fillet6_piece_15b_section:
        with BuildLine():
            CenterArc((FILLET6_R, FILLET6_R), FILLET6_R, 180, 90)
            Line((0, FILLET6_R), (0, 0))
            Line((0, 0), (FILLET6_R, 0))
        make_face()
    fillet6_piece_15b = extrude(amount=120, mode=Mode.PRIVATE)
    fillet6_piece_15b = split(fillet6_piece_15b, bisect_by=Plane(origin=(705.472097715, 495.472097715, 180), z_dir=(0, 0, -1)), keep=Keep.TOP, mode=Mode.PRIVATE)
    fillet6_piece_15 = fillet6_piece_15a & fillet6_piece_15b
    add(fillet6_piece_15, mode=Mode.SUBTRACT)
    with BuildSketch(Plane(origin=(0, 1350, 180), x_dir=(1, 0, 0), z_dir=(0, -1, 0))) as fillet6_piece_16a_section:
        with BuildLine():
            CenterArc((FILLET6_R, -FILLET6_R), FILLET6_R, 90, 90)
            Line((0, -FILLET6_R), (0, 0))
            Line((0, 0), (FILLET6_R, 0))
        make_face()
    fillet6_piece_16a = extrude(amount=900, mode=Mode.PRIVATE)
    fillet6_piece_16a = split(fillet6_piece_16a, bisect_by=Plane(origin=(4.527902285, 500, 175.472097715), z_dir=(0, -1, 0)), keep=Keep.TOP, mode=Mode.PRIVATE)
    with BuildSketch(Plane(origin=(0, 500, 130), x_dir=(1, 0, 0), z_dir=(0, 0, 1))) as fillet6_piece_16b_section:
        with BuildLine():
            CenterArc((FILLET6_R, -FILLET6_R), FILLET6_R, 90, 90)
            Line((0, -FILLET6_R), (0, 0))
            Line((0, 0), (FILLET6_R, 0))
        make_face()
    fillet6_piece_16b = extrude(amount=120, mode=Mode.PRIVATE)
    fillet6_piece_16b = split(fillet6_piece_16b, bisect_by=Plane(origin=(4.527902285, 495.472097715, 180), z_dir=(0, 0, -1)), keep=Keep.TOP, mode=Mode.PRIVATE)
    fillet6_piece_16 = fillet6_piece_16a & fillet6_piece_16b
    add(fillet6_piece_16, mode=Mode.SUBTRACT)

    # Fillet7
    fillet7_edges = [part.edges().sort_by_distance(p)[0] for p in [
        (170, 325, 200),
        (540, 325, 200),
    ]]
    fillet(fillet7_edges, radius=FILLET7_R)

    # Fillet8
    fillet8_edges = [part.edges().sort_by_distance(p)[0] for p in [
        (355, 500, 235),
        (170, 325, 235),
        (540, 325, 235),
        (355, 150, 235),
    ]]
    fillet(fillet8_edges, radius=FILLET8_R)


with BuildPart() as body_2:
    # Sketch10 → Boss-Extrude4 (new body)
    with BuildSketch(Plane.XY.offset(275)):
        with Locations((355, 290)):
            Circle(SKETCH10_R)
    extrude(amount=BOSS_EXTRUDE4_DEPTH)


solid = Compound([part.part, body_2.part])
